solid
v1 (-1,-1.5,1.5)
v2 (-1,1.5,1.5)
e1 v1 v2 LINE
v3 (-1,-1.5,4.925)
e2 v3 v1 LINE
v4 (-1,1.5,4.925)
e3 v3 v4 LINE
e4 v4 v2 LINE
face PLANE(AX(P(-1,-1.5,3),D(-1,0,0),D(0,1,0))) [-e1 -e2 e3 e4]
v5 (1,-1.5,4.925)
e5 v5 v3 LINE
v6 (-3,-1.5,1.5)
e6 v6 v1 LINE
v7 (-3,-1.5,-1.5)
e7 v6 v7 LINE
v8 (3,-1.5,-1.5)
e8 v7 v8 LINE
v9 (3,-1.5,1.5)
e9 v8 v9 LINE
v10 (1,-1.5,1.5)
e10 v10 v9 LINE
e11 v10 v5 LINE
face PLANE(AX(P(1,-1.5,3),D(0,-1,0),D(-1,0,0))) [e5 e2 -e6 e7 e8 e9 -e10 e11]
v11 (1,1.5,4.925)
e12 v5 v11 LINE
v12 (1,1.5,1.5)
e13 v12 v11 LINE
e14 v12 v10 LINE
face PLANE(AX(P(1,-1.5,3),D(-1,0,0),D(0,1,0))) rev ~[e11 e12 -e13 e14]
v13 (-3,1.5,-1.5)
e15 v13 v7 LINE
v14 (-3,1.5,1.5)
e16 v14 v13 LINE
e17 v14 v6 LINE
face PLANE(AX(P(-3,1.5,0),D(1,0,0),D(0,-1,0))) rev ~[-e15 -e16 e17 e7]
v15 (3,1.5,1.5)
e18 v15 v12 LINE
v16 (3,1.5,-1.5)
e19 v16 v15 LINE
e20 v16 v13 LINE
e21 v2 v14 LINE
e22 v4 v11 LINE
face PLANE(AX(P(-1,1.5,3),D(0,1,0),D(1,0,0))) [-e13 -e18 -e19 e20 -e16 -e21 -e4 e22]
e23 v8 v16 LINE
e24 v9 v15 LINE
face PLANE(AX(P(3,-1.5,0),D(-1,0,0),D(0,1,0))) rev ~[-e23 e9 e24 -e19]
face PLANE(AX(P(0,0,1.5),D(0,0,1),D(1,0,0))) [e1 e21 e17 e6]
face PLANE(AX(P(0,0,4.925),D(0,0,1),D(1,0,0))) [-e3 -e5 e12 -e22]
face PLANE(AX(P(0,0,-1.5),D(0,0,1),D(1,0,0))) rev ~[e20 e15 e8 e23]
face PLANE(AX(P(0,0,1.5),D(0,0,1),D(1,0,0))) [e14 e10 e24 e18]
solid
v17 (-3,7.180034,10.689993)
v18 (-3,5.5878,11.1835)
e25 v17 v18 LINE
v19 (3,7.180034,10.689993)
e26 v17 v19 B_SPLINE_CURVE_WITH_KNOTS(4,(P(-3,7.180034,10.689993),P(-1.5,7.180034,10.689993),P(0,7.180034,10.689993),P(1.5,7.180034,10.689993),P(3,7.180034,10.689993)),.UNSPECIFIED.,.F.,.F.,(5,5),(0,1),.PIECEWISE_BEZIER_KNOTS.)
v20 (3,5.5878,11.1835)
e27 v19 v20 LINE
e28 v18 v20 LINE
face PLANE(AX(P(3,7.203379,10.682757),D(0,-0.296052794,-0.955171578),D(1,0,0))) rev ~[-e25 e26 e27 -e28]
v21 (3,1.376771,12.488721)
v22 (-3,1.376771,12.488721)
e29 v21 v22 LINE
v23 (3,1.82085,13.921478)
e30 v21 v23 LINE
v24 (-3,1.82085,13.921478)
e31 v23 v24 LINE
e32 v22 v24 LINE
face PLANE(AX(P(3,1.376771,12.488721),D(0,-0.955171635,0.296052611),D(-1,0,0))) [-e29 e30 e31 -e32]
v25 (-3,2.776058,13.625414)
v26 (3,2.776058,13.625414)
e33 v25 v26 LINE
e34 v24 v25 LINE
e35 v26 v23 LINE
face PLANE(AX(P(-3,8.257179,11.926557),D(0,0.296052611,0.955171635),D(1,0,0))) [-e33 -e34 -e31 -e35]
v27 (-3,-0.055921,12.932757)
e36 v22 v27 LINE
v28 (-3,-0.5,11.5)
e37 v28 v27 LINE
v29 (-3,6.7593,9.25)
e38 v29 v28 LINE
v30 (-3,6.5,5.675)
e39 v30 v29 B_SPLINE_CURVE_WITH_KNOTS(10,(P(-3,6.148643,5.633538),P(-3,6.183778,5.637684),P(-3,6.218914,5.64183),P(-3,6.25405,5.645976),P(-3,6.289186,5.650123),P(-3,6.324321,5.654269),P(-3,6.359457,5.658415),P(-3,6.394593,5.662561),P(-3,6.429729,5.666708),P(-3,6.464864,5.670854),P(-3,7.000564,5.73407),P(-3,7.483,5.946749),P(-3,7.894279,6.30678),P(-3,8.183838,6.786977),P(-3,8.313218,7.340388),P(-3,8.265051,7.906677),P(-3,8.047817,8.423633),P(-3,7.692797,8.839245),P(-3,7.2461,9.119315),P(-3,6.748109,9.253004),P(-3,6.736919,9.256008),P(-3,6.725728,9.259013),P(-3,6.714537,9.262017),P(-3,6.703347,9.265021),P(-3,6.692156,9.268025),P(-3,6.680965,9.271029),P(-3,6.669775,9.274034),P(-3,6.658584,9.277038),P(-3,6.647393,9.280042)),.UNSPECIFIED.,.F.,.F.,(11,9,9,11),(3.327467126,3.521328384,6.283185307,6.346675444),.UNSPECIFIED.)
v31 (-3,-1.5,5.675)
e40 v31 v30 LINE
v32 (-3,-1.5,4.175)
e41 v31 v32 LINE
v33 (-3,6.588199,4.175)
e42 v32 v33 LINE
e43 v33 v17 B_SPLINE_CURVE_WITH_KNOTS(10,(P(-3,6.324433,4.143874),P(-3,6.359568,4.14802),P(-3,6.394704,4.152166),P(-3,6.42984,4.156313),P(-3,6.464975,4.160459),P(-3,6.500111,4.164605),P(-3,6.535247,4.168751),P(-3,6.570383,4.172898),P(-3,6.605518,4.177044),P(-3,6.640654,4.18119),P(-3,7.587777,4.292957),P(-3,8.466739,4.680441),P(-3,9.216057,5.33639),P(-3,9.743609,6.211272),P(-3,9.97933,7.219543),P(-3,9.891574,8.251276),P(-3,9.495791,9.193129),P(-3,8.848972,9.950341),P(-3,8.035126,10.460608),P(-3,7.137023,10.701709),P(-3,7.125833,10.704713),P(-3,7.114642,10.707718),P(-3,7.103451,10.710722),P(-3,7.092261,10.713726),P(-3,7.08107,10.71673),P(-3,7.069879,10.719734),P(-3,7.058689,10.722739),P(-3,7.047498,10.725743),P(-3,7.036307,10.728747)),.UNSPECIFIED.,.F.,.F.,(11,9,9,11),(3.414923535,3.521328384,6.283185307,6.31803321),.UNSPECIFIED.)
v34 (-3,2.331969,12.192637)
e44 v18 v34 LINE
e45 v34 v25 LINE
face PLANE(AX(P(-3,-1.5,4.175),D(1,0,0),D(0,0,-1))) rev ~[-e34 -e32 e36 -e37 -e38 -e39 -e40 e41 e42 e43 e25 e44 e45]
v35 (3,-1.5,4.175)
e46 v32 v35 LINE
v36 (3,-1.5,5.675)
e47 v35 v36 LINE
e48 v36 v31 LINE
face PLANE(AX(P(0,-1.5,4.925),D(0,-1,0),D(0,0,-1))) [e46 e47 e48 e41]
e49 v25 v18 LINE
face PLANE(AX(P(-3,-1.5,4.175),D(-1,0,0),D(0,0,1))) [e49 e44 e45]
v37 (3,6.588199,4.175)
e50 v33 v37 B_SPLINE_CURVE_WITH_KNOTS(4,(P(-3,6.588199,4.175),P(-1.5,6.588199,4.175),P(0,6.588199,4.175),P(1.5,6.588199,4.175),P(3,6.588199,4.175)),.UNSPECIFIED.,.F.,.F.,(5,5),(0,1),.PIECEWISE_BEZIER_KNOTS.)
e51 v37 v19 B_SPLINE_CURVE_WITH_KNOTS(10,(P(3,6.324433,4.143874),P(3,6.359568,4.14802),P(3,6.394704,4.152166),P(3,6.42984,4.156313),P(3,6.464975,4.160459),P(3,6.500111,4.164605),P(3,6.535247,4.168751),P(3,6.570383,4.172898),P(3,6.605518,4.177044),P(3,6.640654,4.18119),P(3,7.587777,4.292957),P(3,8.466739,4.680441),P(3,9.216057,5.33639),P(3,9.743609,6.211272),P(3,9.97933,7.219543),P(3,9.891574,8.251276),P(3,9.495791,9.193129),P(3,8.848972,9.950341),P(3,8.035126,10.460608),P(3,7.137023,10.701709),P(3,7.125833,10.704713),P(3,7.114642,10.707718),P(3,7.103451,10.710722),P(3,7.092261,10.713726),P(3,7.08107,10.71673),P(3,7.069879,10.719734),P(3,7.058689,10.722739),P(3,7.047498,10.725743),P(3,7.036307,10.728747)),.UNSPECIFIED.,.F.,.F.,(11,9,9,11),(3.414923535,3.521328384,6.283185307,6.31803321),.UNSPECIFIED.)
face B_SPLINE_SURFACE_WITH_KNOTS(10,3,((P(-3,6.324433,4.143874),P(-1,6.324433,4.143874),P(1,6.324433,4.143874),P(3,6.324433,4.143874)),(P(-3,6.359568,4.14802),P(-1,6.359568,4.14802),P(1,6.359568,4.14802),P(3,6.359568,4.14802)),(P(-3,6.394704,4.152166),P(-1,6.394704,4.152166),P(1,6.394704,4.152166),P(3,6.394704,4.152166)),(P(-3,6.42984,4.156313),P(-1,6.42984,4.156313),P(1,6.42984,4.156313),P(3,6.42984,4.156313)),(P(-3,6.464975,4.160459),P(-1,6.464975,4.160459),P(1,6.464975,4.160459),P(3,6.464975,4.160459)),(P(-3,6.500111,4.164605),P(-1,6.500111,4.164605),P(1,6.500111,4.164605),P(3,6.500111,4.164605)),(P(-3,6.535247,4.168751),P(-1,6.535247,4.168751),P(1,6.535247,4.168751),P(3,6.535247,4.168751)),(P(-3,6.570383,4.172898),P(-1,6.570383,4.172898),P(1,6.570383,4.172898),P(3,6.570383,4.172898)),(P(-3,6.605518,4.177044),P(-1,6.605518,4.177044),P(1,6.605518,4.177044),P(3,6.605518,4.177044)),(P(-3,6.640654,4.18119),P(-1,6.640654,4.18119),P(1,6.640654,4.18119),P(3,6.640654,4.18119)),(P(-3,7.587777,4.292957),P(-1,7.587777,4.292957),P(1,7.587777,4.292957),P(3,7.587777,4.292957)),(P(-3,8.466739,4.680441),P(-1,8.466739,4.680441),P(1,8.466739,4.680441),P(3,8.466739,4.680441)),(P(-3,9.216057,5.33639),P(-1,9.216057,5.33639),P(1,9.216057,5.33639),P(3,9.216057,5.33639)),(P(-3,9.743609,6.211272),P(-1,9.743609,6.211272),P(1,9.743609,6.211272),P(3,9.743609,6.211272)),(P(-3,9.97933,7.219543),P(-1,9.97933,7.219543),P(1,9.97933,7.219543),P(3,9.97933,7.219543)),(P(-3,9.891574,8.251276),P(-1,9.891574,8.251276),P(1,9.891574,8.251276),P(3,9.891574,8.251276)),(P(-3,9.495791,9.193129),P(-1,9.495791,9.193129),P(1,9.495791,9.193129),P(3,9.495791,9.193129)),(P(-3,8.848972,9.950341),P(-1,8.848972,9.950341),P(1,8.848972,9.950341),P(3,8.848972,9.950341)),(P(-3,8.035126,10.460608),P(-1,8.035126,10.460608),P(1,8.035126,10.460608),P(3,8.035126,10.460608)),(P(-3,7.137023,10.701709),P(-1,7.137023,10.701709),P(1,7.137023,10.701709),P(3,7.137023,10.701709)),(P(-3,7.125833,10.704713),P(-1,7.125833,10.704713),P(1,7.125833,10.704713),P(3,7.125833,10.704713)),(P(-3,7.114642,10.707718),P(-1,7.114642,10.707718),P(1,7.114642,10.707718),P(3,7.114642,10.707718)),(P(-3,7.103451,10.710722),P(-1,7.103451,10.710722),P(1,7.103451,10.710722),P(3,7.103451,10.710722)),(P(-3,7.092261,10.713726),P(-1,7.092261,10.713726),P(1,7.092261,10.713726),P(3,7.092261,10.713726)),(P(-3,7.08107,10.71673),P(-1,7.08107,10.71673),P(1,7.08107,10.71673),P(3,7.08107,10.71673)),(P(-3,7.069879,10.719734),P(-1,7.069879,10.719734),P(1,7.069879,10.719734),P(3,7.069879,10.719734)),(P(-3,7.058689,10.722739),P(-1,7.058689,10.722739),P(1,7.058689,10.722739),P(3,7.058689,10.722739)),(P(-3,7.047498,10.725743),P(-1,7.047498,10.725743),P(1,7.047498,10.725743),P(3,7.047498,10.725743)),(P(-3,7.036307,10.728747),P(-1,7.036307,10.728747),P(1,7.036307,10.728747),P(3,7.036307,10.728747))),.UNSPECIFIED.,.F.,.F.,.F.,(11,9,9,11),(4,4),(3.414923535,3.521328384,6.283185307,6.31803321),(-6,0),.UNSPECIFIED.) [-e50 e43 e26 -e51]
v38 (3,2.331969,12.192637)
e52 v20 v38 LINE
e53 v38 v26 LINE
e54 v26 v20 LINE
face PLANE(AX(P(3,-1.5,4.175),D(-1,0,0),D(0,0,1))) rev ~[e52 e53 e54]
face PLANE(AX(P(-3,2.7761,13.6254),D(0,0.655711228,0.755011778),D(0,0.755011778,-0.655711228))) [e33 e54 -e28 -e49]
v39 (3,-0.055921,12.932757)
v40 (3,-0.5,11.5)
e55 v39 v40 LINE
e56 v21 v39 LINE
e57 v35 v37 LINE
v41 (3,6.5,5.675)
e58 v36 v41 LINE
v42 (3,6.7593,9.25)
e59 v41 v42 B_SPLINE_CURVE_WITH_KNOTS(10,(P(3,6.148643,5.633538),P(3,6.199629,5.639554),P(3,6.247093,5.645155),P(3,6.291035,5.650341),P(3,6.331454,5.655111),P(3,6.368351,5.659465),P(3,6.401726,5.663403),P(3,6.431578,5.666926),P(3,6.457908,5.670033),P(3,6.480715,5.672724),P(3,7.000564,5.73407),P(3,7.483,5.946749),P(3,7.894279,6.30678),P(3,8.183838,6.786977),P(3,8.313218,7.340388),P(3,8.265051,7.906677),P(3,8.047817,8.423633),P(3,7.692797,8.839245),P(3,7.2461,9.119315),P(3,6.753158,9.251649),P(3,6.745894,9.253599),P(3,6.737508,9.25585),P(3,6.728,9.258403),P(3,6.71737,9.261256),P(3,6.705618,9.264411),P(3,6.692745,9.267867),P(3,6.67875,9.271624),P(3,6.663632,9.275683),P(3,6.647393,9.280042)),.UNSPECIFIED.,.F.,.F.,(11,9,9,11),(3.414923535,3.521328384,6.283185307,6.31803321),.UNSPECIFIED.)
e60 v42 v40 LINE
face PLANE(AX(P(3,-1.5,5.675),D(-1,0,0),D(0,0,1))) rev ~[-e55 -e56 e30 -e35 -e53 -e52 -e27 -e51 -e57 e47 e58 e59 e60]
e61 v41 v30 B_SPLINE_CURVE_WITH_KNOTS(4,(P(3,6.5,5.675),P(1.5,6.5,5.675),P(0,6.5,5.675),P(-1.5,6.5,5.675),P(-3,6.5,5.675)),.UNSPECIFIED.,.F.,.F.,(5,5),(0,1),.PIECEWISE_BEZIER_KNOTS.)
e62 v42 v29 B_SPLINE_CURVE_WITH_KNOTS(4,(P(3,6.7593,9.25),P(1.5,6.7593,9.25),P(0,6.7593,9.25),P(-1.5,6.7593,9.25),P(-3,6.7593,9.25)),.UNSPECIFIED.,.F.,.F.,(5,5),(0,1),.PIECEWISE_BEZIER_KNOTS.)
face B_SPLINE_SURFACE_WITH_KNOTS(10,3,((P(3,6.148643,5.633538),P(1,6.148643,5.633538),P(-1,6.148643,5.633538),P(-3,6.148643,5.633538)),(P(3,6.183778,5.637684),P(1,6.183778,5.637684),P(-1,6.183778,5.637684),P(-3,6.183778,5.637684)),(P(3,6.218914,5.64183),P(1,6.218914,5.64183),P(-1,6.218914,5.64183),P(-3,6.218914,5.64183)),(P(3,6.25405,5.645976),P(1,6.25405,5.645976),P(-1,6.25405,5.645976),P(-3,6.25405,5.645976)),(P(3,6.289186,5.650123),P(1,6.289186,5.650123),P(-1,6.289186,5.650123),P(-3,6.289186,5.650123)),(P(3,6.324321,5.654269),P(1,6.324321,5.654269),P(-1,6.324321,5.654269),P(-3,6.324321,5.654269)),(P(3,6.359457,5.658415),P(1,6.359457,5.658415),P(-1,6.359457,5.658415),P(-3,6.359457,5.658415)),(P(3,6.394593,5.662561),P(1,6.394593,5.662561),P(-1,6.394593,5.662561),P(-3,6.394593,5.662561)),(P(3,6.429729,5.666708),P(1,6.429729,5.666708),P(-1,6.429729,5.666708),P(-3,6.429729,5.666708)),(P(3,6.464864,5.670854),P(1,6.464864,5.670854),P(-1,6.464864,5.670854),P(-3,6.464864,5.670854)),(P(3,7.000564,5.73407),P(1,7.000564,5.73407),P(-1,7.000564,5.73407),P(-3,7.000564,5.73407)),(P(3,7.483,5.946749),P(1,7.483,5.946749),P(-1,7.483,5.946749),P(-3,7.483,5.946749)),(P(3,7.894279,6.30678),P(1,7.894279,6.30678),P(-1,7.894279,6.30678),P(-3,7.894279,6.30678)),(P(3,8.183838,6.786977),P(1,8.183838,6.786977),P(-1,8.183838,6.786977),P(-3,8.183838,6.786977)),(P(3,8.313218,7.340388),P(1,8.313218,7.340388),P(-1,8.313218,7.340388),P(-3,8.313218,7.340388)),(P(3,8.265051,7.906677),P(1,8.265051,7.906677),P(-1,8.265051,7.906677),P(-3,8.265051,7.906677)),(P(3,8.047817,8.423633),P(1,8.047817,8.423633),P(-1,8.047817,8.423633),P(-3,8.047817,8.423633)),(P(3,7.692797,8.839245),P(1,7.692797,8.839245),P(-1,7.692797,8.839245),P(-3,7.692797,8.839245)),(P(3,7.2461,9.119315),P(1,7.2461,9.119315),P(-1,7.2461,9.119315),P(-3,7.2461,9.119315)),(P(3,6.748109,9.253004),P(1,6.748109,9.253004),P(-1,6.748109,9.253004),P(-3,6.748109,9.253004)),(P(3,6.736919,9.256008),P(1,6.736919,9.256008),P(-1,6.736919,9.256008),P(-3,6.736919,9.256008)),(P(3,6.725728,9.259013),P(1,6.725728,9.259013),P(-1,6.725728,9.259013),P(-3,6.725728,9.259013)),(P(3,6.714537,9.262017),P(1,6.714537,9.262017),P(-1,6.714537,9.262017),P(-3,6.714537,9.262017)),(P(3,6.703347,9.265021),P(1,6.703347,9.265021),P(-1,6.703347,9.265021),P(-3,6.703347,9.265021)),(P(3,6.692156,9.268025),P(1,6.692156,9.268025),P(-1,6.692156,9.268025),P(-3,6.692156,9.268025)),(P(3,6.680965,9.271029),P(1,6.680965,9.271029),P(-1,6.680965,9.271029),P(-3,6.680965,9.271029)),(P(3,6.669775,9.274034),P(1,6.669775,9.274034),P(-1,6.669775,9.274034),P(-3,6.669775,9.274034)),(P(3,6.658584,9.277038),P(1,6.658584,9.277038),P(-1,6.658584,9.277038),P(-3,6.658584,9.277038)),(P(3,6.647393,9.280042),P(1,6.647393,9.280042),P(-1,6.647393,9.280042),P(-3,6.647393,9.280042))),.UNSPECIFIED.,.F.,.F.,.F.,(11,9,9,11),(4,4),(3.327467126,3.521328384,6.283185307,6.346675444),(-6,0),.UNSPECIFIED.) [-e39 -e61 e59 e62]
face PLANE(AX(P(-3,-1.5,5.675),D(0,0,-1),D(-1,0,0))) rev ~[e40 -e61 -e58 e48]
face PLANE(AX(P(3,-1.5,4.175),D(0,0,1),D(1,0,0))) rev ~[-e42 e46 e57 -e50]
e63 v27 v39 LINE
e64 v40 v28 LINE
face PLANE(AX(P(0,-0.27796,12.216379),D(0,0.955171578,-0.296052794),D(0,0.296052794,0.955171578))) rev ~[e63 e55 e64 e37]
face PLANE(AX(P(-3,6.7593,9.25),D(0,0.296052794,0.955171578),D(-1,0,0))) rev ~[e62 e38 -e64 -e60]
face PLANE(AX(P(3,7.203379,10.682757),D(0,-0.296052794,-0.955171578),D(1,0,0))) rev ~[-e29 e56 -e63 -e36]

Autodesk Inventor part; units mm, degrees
ref_plane "YZ Plane" through (0, 0, 0) normal (1, 0, 0) x (0, 1, 0)
ref_plane "XZ Plane" through (0, 0, 0) normal (0, 1, 0) x (-1, 0, 0)
ref_plane "XY Plane" through (0, 0, 0) normal (0, 0, 1) x (1, 0, 0)
sketch "Sketch6" plane through (0, 0, 0) normal (0, 0, 1) x (1, 0, 0)
  line L0 (3, -1.5) -> (3, 1.5)
  line L1 (3, 1.5) -> (-3, 1.5)
  line L2 (-3, 1.5) -> (-3, -1.5)
  line L3 (-3, -1.5) -> (3, -1.5)
  line L4 (3, -1.5) -> (-3, 1.5) construction
  line L5 (3, 1.5) -> (-3, -1.5) construction
  point P0 (0, 0)
  dimension "d11" = 3
  dimension "d12" = 6
extrude "Extrusion4" add sketch "Sketch6" along normal mid plane 3
ref_plane "Work Plane1" through (0, 0, 0) normal (0, 0, 1) x (1, 0, 0)
sketch "Sketch8" plane through (0, 0, 1.5) normal (0, 0, 1) x (1, 0, 0)
  line L0 (-1, -1.5) -> (-1, 1.5)
  line L1 (-1, 1.5) -> (1, 1.5)
  line L2 (1, 1.5) -> (1, -1.5)
  line L3 (1, -1.5) -> (-1, -1.5)
  line L4 (-1, -1.5) -> (1, 1.5) construction
  line L5 (-1, 1.5) -> (1, -1.5) construction
  line L6 (3, 1.5) -> (-3, 1.5) projected
  point P0 (0, 0)
  dimension "d19" = 3
  dimension "d20" = 2
extrude "Extrusion6" add sketch "Sketch8" along normal blind 1.5
ref_plane "Work Plane4" through (-3, 0, -1.5) normal (0, 1, 0) x (1, 0, 0)
ref_plane "Work Plane5" through (0, -1.5, 1.5) normal (-1, 0, 0) x (0, 0, 1)
sketch "Sketch9" plane through (0, 0, 3) normal (0, 0, 1) x (1, 0, 0)
  point P0 (0, 0)
sketch "Sketch10" plane through (0, -1.5, 1.5) normal (-1, 0, 0) x (0, 0, 1)
  point P0 (-1.5, 1.5)
sketch "Sketch11" plane through (0, 0, 3) normal (0, 0, 1) x (1, 0, 0)
  point P0 (0, 0)
sketch "Sketch12" plane through (0, -1.5, 1.5) normal (-1, 0, 0) x (0, 0, 1)
  point P0 (-1.5, 1.5)
sketch "Sketch13" plane through (0, -1.5, 1.5) normal (-1, 0, 0) x (0, 0, 1)
  point P0 (-1.5, 1.5)
sketch "Sketch15" plane through (0, -1.5, 1.5) normal (-1, 0, 0) x (0, 0, 1)
  line L0 (4.175, 0) -> (4.175, 8)
  arc A0 (7.75, 8.2593) -> (4.175, 8) centre (5.9874, 7.7861) ccw
  line L1 (7.75, 8.2593) -> (10, 1)
  line L2 (0, 0) -> (1.5, 0) projected
  line L3 (1.5, 0) -> (6.1638, 0) construction
  line L4 (1.5, 3) -> (1.5, 0) projected
  point P0 (-1.5, 1.5)
  dimension "d31" = 8
  dimension "d34" = 7.6
  dimension "d41" = 2.675
  dimension "d48" = 3.575
sketch "Sketch18" plane through (-3, -1.5, -1.5) normal (0, -1, 0) x (1, 0, 0)
  line L0 (6, 5.675) -> (0, 5.675)
  line L1 (0, 5.675) -> (0, 7.175)
  line L2 (0, 7.175) -> (6, 7.175)
  line L3 (6, 7.175) -> (6, 5.675)
  line L4 (6, 5.675) -> (0.1205, 6.5404) construction
  line L5 (0, 5.675) -> (6, 7.175) construction
  line L6 (2, 4.5) -> (4, 4.5) projected
  point P0 (3, 1.5)
  point P1 (2.2234, 6.2309)
  point P2 (3, 4.5)
  point P3 (3, 4.5)
  point P4 (3, 7.175)
  point P5 (3, 7.175)
  dimension "d37" = 6
  dimension "d38" = 1.5
  dimension "d42" = 0
sweep "Sweep1" add profiles "Sketch18" path "Sketch15" separate body path curves L0 A0 L1
sketch "Sketch19" plane through (-3, 7.8131, 10.4938) normal (0, 0.2960526, 0.9551716) x (1, 0, 0)
  line L0 (0, -7.469) -> (0, 0.1723) projected
  line L1 (6, -0.6384) -> (6, -8.2384) projected
  line L2 (0, -5.7384) -> (6, -5.7384)
  line L3 (6, -5.7384) -> (6, -6.7384)
  line L4 (6, -6.7384) -> (0, -6.7384)
  line L5 (0, -6.7384) -> (0, -5.7384)
  line L6 (6, -8.2384) -> (0, -8.2384) projected
  point P0 (3, -4.3562)
  point P1 (0, -6.7384)
  point P2 (6, -5.7384)
  point P3 (0, -6.7384)
  dimension "d49" = 1.5
  dimension "d50" = 1
extrude "Extrusion7" add sketch "Sketch19" along normal blind 1.5 bodies 2
sketch "Sketch20" plane through (-3, -1.5, 4.175) normal (-1, 0, 0) x (0, 0, 1)
  line L0 (8.0176, 3.832) -> (9.4504, 4.2761) projected
  line L1 (9.4504, 4.2761) -> (7.0085, 7.0878)
  line L2 (6.515, 8.6801) -> (8.0176, 3.832) projected
  point P0 (-4.175, 1.5)
extrude "Extrusion8" add sketch "Sketch20" against normal blind 6 bodies 2
sketch "Sketch21" plane through (0, 0, 3) normal (0, 0, 1) x (1, 0, 0)
  line L0 (-1, 1.5) -> (-3, 1.5) projected
  line L1 (1, -1.5) -> (1, 1.5) projected
  line L2 (-1, 1.5) -> (1, 1.5)
  line L3 (1, 1.5) -> (1, -1.5)
  line L4 (1, -1.5) -> (-1, -1.5)
  line L5 (-1, -1.5) -> (-1, 1.5)
  point P0 (0, 0)
extrude "Extrusion9" add sketch "Sketch21" along normal blind 1.925 bodies 1
equation "\"d11\" = PCB_thickness"
equation "\"d12\" = clipper_uppter_t_length"
equation "\"d13\" = 0.5 * wall_thickness"
equation "\"d19\" = PCB_thickness"
equation "\"d20\" = clipp_lower_t_part_thickness"
equation "\"d21\" = 0.25 * wall_thickness"
equation "\"d31\" = arm_heigth"
equation "\"d34\" = 0.95 * arm_heigth"
equation "\"d41\" = 0.5 * spring_thickness + 0.35 * gap_width"
equation "\"d48\" = 0.65 * gap_width"
equation "\"d37\" = spring_width"
equation "\"d38\" = spring_thickness"
equation "\"d49\" = hook_offset"
equation "\"d46\" = spring_width"
equation "\"d51\" = 0.35 * gap_width"
equation "\"wall_thickness\" = 6"
equation "\"PCB_thickness\" = 3"
equation "\"clipp_lower_t_part_thickness\" = 2"
equation "\"clipper_uppter_t_length\" = 6"
equation "\"arm_heigth\" = 8"
equation "\"arc_radius\" = 1.3"
equation "\"gap_width\" = 5.5"
equation "\"spring_thickness\" = 1.5"
equation "\"spring_width\" = 6"
equation "\"hook_length\" = 3"
equation "\"hook_offset\" = 1.5"
properties part number "Clipper"
